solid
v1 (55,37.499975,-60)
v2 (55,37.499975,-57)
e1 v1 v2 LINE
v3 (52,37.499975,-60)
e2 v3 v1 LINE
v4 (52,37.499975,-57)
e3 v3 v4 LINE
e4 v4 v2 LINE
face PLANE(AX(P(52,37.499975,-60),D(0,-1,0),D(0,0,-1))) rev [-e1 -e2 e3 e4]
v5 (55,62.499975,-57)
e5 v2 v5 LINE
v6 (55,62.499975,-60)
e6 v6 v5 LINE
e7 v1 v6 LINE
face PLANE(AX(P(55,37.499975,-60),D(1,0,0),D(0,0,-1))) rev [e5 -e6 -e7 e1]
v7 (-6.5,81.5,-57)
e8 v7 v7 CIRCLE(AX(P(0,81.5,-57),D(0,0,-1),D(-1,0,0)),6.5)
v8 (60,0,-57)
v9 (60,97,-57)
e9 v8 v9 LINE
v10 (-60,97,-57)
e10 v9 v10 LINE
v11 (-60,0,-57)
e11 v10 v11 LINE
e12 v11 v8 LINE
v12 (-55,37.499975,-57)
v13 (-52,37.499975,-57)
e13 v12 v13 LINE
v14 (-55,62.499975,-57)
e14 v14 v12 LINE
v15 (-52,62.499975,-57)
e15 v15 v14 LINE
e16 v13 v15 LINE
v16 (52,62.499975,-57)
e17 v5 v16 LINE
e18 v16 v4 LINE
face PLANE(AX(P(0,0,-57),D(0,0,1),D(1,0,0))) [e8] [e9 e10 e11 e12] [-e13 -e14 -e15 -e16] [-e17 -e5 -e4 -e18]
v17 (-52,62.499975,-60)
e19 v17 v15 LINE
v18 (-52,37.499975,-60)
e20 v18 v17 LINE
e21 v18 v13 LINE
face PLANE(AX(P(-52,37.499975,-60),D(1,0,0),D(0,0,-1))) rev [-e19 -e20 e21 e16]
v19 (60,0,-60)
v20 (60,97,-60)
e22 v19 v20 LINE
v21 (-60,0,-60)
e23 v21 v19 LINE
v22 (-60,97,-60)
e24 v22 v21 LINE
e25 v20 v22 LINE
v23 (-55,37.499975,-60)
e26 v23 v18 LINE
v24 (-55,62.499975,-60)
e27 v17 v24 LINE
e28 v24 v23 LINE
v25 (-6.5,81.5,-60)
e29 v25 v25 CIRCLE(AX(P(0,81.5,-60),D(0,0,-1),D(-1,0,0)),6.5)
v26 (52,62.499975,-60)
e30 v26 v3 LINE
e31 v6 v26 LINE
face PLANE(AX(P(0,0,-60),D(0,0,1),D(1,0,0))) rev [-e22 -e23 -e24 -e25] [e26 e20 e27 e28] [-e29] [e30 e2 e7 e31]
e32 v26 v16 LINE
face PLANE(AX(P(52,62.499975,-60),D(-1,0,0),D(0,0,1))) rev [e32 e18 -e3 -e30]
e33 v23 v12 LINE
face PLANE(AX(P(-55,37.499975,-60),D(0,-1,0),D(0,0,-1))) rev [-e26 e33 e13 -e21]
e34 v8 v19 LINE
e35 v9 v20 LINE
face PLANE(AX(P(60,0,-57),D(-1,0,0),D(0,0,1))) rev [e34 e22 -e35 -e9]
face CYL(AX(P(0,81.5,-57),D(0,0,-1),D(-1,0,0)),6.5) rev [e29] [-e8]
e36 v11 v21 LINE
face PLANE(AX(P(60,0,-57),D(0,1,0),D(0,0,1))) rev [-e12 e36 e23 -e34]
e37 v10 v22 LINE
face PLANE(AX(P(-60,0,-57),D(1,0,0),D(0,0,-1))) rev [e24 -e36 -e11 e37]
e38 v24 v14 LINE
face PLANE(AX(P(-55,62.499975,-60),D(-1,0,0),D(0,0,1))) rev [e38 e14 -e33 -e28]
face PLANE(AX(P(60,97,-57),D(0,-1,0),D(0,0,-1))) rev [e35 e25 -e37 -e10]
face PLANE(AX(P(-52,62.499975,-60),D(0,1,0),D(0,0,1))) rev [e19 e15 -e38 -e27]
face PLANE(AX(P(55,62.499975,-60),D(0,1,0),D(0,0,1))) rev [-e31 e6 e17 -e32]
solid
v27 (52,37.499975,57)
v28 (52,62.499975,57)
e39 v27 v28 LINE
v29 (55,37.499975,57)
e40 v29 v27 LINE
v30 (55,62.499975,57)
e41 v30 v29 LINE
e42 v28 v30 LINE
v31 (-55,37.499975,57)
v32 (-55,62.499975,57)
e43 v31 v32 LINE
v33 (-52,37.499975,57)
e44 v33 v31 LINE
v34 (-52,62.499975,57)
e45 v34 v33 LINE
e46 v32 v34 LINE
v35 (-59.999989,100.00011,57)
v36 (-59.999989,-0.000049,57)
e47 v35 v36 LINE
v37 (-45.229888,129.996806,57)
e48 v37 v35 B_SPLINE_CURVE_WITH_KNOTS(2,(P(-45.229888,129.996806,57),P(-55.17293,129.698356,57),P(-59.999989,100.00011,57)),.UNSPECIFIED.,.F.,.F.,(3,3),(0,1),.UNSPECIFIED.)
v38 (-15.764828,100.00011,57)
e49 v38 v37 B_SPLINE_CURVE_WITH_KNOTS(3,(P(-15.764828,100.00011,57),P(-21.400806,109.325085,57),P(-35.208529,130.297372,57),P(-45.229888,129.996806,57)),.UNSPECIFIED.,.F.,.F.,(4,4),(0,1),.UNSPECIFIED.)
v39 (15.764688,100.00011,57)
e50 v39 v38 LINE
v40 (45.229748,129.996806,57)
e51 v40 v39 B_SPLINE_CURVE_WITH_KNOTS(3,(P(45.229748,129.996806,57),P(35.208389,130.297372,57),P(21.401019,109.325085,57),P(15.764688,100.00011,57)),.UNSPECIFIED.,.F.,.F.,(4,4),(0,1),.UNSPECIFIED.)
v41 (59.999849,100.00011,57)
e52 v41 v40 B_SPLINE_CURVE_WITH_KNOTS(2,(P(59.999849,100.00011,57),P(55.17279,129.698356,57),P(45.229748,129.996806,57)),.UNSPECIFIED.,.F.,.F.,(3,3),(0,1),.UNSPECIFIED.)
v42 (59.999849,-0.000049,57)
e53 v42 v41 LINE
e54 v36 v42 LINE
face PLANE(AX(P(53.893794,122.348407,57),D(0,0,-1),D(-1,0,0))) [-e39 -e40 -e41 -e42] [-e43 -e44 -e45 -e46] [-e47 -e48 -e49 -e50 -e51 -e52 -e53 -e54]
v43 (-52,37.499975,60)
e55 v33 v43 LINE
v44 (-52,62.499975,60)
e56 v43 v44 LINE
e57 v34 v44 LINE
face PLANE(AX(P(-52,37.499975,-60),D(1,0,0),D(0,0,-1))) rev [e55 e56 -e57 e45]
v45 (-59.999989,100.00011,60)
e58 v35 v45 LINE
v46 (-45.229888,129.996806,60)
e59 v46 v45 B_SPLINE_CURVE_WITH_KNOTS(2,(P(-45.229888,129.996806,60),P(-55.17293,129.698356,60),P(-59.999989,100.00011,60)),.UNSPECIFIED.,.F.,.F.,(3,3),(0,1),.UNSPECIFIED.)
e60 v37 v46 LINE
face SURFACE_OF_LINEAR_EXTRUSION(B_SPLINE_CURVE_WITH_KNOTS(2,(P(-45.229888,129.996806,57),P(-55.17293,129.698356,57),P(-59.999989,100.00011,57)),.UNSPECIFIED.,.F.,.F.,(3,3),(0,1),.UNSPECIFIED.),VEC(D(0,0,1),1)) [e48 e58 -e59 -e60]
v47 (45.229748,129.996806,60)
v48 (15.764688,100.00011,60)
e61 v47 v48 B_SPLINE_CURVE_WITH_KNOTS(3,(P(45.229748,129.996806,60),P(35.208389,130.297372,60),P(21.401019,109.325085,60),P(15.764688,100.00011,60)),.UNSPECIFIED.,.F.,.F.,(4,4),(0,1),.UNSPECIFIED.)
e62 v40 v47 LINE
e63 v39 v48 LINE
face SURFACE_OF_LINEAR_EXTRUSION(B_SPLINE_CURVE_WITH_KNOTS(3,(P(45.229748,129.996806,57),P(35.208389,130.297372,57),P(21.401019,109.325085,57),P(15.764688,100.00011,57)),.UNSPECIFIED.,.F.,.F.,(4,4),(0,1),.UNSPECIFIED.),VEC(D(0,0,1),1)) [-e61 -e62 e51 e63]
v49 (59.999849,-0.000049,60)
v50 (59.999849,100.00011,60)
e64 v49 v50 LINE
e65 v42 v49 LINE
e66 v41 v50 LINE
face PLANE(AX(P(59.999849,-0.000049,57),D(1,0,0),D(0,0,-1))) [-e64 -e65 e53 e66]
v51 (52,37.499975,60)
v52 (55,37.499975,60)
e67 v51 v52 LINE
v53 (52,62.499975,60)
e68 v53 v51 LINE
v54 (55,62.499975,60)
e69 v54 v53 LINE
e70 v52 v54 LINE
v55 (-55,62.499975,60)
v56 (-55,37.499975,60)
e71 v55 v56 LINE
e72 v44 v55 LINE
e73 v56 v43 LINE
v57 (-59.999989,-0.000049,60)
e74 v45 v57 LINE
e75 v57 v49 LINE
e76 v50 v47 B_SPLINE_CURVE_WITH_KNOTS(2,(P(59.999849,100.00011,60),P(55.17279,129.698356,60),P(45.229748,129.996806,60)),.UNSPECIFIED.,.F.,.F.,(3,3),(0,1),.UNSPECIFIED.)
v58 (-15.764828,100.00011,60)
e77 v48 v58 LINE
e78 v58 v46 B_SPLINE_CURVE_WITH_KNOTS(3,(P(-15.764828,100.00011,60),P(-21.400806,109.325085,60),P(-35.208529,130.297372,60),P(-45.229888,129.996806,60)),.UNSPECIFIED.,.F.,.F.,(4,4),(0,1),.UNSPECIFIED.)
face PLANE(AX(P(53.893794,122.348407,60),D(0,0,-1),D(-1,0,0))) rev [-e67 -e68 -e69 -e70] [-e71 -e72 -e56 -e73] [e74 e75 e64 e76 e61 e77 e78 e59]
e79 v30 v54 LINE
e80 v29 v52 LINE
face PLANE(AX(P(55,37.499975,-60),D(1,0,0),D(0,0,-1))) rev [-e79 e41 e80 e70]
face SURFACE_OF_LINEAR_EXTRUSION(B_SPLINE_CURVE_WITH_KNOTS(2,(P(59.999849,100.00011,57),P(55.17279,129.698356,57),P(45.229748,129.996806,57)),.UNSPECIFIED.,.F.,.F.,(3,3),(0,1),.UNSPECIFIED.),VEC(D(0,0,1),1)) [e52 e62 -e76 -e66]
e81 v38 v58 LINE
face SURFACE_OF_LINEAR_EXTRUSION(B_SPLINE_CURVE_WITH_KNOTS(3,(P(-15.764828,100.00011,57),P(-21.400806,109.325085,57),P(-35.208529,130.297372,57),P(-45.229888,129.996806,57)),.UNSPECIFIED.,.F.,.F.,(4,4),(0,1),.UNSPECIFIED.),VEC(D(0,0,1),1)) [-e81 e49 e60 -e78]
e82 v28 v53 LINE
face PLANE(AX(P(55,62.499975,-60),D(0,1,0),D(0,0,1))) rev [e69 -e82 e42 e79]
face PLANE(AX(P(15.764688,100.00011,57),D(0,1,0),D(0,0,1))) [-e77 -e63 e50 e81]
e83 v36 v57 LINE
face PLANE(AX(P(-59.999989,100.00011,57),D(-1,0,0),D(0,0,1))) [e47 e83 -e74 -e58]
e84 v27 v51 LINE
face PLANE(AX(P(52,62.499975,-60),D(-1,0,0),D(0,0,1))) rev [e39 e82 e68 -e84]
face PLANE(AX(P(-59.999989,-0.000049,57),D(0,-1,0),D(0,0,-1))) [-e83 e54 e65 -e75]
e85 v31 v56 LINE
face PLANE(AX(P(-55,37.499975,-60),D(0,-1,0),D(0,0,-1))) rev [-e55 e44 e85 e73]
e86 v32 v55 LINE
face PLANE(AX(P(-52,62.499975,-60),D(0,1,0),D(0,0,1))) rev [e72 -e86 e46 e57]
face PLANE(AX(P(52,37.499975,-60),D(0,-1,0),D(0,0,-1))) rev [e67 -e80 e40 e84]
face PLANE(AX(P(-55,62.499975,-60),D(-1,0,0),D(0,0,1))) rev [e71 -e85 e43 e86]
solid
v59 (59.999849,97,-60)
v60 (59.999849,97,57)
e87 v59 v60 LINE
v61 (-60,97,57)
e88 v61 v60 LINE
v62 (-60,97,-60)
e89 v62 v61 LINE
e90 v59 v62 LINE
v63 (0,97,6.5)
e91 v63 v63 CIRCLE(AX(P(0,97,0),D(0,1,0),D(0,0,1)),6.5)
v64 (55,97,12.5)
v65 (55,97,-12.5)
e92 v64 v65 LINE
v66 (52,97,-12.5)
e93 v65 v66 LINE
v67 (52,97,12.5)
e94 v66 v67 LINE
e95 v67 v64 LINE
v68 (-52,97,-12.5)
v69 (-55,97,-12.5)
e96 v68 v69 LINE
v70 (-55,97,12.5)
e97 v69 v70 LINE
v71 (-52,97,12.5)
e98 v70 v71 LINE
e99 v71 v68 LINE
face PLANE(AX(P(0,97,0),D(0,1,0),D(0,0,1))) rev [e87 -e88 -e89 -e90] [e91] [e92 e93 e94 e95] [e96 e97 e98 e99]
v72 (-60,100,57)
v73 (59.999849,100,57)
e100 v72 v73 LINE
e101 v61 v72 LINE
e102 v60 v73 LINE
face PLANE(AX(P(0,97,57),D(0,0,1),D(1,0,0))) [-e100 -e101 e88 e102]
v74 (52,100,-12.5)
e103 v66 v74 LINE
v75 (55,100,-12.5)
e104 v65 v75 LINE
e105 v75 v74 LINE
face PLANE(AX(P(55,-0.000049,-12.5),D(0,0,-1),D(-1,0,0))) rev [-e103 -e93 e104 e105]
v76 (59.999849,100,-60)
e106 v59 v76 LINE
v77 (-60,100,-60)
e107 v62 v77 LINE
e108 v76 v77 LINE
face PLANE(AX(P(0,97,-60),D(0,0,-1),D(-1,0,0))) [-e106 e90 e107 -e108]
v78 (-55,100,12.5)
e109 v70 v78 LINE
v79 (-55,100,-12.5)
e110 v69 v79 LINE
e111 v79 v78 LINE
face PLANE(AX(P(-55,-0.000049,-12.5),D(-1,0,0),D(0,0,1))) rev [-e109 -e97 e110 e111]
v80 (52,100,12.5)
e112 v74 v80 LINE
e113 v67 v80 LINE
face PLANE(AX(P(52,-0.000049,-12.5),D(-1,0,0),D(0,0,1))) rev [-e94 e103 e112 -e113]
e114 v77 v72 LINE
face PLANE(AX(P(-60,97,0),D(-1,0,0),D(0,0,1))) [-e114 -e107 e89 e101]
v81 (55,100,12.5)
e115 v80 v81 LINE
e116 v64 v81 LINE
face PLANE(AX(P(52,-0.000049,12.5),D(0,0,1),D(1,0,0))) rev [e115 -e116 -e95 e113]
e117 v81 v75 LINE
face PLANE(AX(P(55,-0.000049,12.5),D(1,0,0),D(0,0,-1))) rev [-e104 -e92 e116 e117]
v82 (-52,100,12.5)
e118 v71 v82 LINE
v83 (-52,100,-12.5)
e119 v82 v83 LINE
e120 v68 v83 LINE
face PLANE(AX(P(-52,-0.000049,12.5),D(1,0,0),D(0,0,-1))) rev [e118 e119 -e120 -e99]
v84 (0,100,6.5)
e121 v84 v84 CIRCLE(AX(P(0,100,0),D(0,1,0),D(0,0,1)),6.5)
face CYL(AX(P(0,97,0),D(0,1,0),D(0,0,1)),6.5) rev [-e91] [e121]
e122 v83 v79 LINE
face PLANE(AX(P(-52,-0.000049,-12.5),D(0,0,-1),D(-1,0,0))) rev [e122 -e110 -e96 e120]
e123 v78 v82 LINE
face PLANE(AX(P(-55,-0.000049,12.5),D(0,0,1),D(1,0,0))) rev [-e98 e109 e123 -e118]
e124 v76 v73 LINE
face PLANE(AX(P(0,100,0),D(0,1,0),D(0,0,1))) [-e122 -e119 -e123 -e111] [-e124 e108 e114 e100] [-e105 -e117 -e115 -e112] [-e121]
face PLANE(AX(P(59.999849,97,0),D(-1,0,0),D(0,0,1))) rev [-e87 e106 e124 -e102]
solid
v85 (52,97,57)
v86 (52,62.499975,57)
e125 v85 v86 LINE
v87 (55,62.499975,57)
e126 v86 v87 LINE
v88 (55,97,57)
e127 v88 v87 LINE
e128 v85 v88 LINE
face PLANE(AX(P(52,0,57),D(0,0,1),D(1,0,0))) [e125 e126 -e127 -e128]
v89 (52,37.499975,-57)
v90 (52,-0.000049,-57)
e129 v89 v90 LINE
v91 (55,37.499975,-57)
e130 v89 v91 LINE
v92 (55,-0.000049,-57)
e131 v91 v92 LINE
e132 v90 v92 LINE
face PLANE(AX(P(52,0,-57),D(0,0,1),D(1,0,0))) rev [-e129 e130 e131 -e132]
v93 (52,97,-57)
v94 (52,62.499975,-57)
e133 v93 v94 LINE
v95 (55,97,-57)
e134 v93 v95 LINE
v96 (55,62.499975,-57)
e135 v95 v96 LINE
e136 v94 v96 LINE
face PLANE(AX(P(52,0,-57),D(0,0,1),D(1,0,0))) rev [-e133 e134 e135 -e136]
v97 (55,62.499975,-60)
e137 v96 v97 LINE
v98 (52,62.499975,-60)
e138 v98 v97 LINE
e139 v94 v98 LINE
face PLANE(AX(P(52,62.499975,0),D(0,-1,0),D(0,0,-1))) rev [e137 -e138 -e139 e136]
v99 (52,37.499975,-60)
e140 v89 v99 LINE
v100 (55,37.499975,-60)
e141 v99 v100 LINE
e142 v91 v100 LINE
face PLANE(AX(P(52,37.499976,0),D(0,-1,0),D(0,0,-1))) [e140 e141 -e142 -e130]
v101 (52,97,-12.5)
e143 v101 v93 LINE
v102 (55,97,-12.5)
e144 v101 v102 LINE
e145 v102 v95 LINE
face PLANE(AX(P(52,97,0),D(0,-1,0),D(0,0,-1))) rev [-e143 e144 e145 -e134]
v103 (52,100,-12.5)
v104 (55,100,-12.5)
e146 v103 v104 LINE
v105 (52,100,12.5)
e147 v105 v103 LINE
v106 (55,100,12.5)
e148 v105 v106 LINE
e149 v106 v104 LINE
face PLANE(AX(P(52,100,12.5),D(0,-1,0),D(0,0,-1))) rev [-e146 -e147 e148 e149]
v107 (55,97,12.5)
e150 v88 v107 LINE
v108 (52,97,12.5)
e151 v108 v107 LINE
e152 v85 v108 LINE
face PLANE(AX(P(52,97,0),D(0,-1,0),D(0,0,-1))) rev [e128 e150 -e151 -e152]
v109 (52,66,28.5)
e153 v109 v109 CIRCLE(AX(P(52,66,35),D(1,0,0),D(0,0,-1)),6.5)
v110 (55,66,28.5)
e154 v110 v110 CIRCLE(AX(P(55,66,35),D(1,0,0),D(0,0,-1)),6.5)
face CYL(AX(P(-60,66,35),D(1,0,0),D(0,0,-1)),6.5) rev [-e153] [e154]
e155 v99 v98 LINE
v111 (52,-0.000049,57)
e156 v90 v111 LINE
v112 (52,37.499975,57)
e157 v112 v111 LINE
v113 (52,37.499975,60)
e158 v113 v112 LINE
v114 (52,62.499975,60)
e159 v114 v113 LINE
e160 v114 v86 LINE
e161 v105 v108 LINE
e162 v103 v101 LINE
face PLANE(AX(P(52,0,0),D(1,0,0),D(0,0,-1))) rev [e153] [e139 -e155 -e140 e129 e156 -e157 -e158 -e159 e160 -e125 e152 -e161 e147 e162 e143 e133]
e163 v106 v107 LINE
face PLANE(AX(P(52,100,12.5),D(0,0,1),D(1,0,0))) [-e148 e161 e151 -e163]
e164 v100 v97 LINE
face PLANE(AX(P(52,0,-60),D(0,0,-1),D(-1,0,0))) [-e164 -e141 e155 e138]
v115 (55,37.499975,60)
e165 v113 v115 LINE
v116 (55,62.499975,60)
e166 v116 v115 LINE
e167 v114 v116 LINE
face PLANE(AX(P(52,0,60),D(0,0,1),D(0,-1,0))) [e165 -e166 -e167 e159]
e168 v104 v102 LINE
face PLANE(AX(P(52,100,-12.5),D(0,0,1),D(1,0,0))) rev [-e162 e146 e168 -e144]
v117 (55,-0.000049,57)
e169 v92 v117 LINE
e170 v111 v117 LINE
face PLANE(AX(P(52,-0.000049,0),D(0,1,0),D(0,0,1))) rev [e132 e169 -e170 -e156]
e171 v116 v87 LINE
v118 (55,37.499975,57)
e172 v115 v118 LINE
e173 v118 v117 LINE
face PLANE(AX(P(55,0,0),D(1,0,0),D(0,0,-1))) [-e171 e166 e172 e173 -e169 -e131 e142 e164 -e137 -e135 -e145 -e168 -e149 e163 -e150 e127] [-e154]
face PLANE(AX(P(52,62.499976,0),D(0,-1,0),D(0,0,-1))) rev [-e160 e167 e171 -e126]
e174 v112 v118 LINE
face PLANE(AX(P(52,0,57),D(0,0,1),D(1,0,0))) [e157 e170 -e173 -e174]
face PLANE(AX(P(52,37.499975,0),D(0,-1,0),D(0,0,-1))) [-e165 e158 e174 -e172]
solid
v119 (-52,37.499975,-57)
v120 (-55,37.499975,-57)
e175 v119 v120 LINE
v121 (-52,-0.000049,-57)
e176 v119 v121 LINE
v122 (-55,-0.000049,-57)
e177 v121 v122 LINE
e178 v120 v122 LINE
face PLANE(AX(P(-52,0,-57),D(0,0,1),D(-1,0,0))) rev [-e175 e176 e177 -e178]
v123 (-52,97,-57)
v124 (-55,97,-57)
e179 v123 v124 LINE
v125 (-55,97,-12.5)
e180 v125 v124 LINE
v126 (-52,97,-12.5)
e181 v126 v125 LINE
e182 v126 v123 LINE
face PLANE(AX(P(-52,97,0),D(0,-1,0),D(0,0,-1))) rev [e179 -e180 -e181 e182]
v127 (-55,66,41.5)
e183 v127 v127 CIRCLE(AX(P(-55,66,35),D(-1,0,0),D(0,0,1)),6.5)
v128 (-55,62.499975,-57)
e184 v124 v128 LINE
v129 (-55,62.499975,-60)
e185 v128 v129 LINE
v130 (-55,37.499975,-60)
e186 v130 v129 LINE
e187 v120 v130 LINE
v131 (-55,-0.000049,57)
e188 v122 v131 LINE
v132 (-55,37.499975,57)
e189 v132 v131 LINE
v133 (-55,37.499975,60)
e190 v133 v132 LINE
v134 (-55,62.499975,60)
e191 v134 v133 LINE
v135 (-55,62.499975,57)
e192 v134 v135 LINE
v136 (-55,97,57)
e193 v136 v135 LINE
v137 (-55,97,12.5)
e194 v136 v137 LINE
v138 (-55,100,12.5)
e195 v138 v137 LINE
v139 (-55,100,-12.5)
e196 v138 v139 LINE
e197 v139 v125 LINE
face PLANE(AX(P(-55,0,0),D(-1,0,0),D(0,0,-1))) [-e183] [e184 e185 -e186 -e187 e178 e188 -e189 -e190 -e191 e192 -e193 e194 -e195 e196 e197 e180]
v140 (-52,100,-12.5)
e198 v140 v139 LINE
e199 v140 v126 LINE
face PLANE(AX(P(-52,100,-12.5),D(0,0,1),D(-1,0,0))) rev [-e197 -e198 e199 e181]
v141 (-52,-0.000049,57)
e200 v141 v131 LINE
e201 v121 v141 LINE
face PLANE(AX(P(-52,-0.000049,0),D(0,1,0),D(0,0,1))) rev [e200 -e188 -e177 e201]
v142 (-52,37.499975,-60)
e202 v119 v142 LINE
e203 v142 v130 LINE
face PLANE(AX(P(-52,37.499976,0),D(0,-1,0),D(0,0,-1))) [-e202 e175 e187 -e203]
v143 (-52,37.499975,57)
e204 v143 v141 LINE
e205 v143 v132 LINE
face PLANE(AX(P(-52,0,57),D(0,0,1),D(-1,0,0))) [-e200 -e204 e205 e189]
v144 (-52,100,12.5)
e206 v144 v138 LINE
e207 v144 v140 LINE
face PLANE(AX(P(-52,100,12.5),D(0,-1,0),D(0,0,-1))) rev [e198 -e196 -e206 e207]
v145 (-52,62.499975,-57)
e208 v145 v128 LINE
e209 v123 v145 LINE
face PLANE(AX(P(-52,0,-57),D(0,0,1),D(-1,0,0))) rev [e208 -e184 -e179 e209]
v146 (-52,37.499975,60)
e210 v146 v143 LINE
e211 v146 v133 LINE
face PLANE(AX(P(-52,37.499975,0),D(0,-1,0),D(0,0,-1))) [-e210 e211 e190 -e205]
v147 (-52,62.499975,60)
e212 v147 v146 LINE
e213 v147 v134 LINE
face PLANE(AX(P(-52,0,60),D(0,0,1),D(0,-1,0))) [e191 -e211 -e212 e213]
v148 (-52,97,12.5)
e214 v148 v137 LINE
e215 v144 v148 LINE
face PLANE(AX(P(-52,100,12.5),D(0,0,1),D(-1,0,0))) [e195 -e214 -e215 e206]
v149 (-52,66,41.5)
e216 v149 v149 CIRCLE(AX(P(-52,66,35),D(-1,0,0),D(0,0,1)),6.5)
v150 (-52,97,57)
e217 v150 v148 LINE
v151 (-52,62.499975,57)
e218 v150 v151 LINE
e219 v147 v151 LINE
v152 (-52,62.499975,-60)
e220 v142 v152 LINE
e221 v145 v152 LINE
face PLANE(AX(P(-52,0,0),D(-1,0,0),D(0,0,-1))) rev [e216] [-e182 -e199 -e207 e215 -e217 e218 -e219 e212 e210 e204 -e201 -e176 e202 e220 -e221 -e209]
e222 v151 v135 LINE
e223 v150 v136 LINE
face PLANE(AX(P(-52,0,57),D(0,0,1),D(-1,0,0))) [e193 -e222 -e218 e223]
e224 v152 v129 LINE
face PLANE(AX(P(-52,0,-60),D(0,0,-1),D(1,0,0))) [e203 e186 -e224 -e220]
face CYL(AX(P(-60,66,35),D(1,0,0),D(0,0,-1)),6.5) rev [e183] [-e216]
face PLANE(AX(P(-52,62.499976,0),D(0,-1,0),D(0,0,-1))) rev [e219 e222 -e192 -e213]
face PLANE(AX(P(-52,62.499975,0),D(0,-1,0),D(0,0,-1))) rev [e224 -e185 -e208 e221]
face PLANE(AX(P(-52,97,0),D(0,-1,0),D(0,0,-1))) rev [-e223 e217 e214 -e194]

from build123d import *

# Parameters (mm, degrees)
SALIENTE_EXTRUIR1_START = 60
SALIENTE_EXTRUIR1_DEPTH = 3
SALIENTE_EXTRUIR2_START = -60
CROQUIS2_W              = 120
CROQUIS2_H              = 100
SALIENTE_EXTRUIR2_DEPTH = 3
SALIENTE_EXTRUIR3_START = -8
SALIENTE_EXTRUIR3_DEPTH = 3
CROQUIS4_W              = 119.999849
CROQUIS4_H              = 117
SALIENTE_EXTRUIR4_DEPTH = 3
CROQUIS5_W              = 3
CROQUIS5_H              = 25
CORTAR_EXTRUIR1_DEPTH   = 187.815418903
MOVER_CARA1_BY          = 3
CROQUIS7_W              = 3
CROQUIS7_H              = 25
CORTAR_EXTRUIR2_DEPTH   = 132.14880797
CROQUIS8_R              = 6.5
CORTAR_EXTRUIR3_DEPTH   = 3
CROQUIS9_R              = 6.5
CORTAR_EXTRUIR4_DEPTH   = 184.643678769
CROQUIS10_R             = 6.5
CORTAR_EXTRUIR5_DEPTH   = 3


# Read off the part's stored shape, not the designer's step: Saliente-Extruir3
with BuildPart() as part:
    # Model → Saliente-Extruir1 (new body)
    with BuildSketch(Plane.XY.offset(SALIENTE_EXTRUIR1_START)):
        with BuildLine():
            Line((15.764688, 100.00011), (-15.764828, 100.00011))
            add(Edge.make_bspline(
                [(-15.764828, 100.00011), (-21.400806, 109.325085), (-35.208529, 130.297372), (-45.229888, 129.996806)],
                knots=[0, 0, 0, 0, 1, 1, 1, 1], degree=3))
            add(Edge.make_bspline(
                [(-45.229888, 129.996806), (-55.17293, 129.698356), (-59.999989, 100.00011)],
                knots=[0, 0, 0, 1, 1, 1], degree=2))
            Line((-59.999989, 100.00011), (-59.999989, -4.9e-05))
            Line((-59.999989, -4.9e-05), (59.999849, -4.9e-05))
            Line((59.999849, -4.9e-05), (59.999849, 100.00011))
            add(Edge.make_bspline(
                [(59.999849, 100.00011), (55.17279, 129.698356), (45.229748, 129.996806)],
                knots=[0, 0, 0, 1, 1, 1], degree=2))
            add(Edge.make_bspline(
                [(45.229748, 129.996806), (35.208389, 130.297372), (21.401019, 109.325085), (15.764688, 100.00011)],
                knots=[0, 0, 0, 0, 1, 1, 1, 1], degree=3))
        make_face()
    extrude(amount=-SALIENTE_EXTRUIR1_DEPTH)


with BuildPart() as body_2:
    # Croquis2 → Saliente-Extruir2 (new body)
    with BuildSketch(Plane.XY.offset(SALIENTE_EXTRUIR2_START)):
        with Locations((0, 50)):
            Rectangle(CROQUIS2_W, CROQUIS2_H)
    extrude(amount=SALIENTE_EXTRUIR2_DEPTH)


with BuildPart() as body_3:
    # Saliente-Extruir3 outline → Saliente-Extruir3 (new body)
    with BuildSketch(Plane(origin=(60, 0, 0), x_dir=(0, 0, -1), z_dir=(1, 0, 0)).offset(SALIENTE_EXTRUIR3_START)):
        Polygon((-57, 62.4999755), (-60, 62.4999755), (-60, 37.4999755), (-57, 37.4999755), (-57, -4.9e-05), (57, -4.9e-05), (57, 37.4999755), (60, 37.4999755), (60, 62.4999755), (57, 62.4999755), (57, 97), (12.5, 97), (12.5, 100), (-12.5, 100), (-12.5, 97), (-57, 97), align=None)
    extrude(amount=SALIENTE_EXTRUIR3_DEPTH)


with BuildPart() as body_4:
    # Simetría2: mirrored copy
    add(body_3.part.mirror(Plane(origin=(0, 0, 0), x_dir=(0, 0, 1), z_dir=(1, 0, 0))))


with BuildPart() as body_5:
    # Croquis4 → Saliente-Extruir4 (new body)
    with BuildSketch(Plane(origin=(0, 100, 0), x_dir=(1, 0, 0), z_dir=(0, 1, 0))):
        with Locations((-7.55e-05, 1.5)):
            Rectangle(CROQUIS4_W, CROQUIS4_H)
    extrude(amount=-SALIENTE_EXTRUIR4_DEPTH)

    # Croquis7 → Cortar-Extruir2 (cut, through all)
    with BuildSketch(Plane(origin=(0, 100, 0), x_dir=(1, 0, 0), z_dir=(0, 1, 0))):
        with Locations((-53.5, 0)):
            Rectangle(CROQUIS7_W, CROQUIS7_H)
        with Locations((53.5, 0)):
            Rectangle(CROQUIS7_W, CROQUIS7_H)
    extrude(amount=-CORTAR_EXTRUIR2_DEPTH, mode=Mode.SUBTRACT)

    # Croquis10 → Cortar-Extruir5 (cut)
    with BuildSketch(Plane(origin=(0, 100, 0), x_dir=(1, 0, 0), z_dir=(0, 1, 0))):
        with Locations(Location((0, 0, 0), (0, 0, 270))):
            Circle(CROQUIS10_R)
    extrude(amount=-CORTAR_EXTRUIR5_DEPTH, mode=Mode.SUBTRACT)


with BuildPart() as cortar_extruir1_tool:
    # Croquis5 → Cortar-Extruir1 (new, through all)
    with BuildSketch(Plane.XY.offset(60)):
        with Locations((-53.5, 49.9999755)):
            Rectangle(CROQUIS5_W, CROQUIS5_H)
        with Locations((53.5, 49.9999755)):
            Rectangle(CROQUIS5_W, CROQUIS5_H)
    extrude(amount=-CORTAR_EXTRUIR1_DEPTH)


with BuildPart() as part_1:
    add(part.part)

    # Cortar-Extruir1: cut by cortar_extruir1_tool
    add(cortar_extruir1_tool.part, mode=Mode.SUBTRACT)


with BuildPart() as body_2_1:
    add(body_2.part)

    # Cortar-Extruir1: cut by cortar_extruir1_tool
    add(cortar_extruir1_tool.part, mode=Mode.SUBTRACT)

    # Mover cara1: a face moved inward by 3.0
    extrude(body_2_1.faces().sort_by_distance((0, 100, -58.5))[0], amount=MOVER_CARA1_BY, dir=(0, -1, 0), mode=Mode.SUBTRACT)

    # Croquis8 → Cortar-Extruir3 (cut)
    with BuildSketch(Plane(origin=(0, 0, -60), x_dir=(-1, 0, 0), z_dir=(0, 0, -1))):
        with Locations((0, 81.5)):
            Circle(CROQUIS8_R)
    extrude(amount=-CORTAR_EXTRUIR3_DEPTH, mode=Mode.SUBTRACT)


with BuildPart() as cortar_extruir4_tool:
    # Croquis9 → Cortar-Extruir4 (new, through all)
    with BuildSketch(Plane(origin=(55, 0, 0), x_dir=(0, 0, -1), z_dir=(1, 0, 0))):
        with Locations(Location((-35, 66, 0), (0, 0, 180))):
            Circle(CROQUIS9_R)
    extrude(amount=-CORTAR_EXTRUIR4_DEPTH)


with BuildPart() as body_3_1:
    add(body_3.part)

    # Cortar-Extruir4: cut by cortar_extruir4_tool
    add(cortar_extruir4_tool.part, mode=Mode.SUBTRACT)


with BuildPart() as body_4_1:
    add(body_4.part)

    # Cortar-Extruir4: cut by cortar_extruir4_tool
    add(cortar_extruir4_tool.part, mode=Mode.SUBTRACT)


solid = Compound([body_5.part, part_1.part, body_2_1.part, body_3_1.part, body_4_1.part])
